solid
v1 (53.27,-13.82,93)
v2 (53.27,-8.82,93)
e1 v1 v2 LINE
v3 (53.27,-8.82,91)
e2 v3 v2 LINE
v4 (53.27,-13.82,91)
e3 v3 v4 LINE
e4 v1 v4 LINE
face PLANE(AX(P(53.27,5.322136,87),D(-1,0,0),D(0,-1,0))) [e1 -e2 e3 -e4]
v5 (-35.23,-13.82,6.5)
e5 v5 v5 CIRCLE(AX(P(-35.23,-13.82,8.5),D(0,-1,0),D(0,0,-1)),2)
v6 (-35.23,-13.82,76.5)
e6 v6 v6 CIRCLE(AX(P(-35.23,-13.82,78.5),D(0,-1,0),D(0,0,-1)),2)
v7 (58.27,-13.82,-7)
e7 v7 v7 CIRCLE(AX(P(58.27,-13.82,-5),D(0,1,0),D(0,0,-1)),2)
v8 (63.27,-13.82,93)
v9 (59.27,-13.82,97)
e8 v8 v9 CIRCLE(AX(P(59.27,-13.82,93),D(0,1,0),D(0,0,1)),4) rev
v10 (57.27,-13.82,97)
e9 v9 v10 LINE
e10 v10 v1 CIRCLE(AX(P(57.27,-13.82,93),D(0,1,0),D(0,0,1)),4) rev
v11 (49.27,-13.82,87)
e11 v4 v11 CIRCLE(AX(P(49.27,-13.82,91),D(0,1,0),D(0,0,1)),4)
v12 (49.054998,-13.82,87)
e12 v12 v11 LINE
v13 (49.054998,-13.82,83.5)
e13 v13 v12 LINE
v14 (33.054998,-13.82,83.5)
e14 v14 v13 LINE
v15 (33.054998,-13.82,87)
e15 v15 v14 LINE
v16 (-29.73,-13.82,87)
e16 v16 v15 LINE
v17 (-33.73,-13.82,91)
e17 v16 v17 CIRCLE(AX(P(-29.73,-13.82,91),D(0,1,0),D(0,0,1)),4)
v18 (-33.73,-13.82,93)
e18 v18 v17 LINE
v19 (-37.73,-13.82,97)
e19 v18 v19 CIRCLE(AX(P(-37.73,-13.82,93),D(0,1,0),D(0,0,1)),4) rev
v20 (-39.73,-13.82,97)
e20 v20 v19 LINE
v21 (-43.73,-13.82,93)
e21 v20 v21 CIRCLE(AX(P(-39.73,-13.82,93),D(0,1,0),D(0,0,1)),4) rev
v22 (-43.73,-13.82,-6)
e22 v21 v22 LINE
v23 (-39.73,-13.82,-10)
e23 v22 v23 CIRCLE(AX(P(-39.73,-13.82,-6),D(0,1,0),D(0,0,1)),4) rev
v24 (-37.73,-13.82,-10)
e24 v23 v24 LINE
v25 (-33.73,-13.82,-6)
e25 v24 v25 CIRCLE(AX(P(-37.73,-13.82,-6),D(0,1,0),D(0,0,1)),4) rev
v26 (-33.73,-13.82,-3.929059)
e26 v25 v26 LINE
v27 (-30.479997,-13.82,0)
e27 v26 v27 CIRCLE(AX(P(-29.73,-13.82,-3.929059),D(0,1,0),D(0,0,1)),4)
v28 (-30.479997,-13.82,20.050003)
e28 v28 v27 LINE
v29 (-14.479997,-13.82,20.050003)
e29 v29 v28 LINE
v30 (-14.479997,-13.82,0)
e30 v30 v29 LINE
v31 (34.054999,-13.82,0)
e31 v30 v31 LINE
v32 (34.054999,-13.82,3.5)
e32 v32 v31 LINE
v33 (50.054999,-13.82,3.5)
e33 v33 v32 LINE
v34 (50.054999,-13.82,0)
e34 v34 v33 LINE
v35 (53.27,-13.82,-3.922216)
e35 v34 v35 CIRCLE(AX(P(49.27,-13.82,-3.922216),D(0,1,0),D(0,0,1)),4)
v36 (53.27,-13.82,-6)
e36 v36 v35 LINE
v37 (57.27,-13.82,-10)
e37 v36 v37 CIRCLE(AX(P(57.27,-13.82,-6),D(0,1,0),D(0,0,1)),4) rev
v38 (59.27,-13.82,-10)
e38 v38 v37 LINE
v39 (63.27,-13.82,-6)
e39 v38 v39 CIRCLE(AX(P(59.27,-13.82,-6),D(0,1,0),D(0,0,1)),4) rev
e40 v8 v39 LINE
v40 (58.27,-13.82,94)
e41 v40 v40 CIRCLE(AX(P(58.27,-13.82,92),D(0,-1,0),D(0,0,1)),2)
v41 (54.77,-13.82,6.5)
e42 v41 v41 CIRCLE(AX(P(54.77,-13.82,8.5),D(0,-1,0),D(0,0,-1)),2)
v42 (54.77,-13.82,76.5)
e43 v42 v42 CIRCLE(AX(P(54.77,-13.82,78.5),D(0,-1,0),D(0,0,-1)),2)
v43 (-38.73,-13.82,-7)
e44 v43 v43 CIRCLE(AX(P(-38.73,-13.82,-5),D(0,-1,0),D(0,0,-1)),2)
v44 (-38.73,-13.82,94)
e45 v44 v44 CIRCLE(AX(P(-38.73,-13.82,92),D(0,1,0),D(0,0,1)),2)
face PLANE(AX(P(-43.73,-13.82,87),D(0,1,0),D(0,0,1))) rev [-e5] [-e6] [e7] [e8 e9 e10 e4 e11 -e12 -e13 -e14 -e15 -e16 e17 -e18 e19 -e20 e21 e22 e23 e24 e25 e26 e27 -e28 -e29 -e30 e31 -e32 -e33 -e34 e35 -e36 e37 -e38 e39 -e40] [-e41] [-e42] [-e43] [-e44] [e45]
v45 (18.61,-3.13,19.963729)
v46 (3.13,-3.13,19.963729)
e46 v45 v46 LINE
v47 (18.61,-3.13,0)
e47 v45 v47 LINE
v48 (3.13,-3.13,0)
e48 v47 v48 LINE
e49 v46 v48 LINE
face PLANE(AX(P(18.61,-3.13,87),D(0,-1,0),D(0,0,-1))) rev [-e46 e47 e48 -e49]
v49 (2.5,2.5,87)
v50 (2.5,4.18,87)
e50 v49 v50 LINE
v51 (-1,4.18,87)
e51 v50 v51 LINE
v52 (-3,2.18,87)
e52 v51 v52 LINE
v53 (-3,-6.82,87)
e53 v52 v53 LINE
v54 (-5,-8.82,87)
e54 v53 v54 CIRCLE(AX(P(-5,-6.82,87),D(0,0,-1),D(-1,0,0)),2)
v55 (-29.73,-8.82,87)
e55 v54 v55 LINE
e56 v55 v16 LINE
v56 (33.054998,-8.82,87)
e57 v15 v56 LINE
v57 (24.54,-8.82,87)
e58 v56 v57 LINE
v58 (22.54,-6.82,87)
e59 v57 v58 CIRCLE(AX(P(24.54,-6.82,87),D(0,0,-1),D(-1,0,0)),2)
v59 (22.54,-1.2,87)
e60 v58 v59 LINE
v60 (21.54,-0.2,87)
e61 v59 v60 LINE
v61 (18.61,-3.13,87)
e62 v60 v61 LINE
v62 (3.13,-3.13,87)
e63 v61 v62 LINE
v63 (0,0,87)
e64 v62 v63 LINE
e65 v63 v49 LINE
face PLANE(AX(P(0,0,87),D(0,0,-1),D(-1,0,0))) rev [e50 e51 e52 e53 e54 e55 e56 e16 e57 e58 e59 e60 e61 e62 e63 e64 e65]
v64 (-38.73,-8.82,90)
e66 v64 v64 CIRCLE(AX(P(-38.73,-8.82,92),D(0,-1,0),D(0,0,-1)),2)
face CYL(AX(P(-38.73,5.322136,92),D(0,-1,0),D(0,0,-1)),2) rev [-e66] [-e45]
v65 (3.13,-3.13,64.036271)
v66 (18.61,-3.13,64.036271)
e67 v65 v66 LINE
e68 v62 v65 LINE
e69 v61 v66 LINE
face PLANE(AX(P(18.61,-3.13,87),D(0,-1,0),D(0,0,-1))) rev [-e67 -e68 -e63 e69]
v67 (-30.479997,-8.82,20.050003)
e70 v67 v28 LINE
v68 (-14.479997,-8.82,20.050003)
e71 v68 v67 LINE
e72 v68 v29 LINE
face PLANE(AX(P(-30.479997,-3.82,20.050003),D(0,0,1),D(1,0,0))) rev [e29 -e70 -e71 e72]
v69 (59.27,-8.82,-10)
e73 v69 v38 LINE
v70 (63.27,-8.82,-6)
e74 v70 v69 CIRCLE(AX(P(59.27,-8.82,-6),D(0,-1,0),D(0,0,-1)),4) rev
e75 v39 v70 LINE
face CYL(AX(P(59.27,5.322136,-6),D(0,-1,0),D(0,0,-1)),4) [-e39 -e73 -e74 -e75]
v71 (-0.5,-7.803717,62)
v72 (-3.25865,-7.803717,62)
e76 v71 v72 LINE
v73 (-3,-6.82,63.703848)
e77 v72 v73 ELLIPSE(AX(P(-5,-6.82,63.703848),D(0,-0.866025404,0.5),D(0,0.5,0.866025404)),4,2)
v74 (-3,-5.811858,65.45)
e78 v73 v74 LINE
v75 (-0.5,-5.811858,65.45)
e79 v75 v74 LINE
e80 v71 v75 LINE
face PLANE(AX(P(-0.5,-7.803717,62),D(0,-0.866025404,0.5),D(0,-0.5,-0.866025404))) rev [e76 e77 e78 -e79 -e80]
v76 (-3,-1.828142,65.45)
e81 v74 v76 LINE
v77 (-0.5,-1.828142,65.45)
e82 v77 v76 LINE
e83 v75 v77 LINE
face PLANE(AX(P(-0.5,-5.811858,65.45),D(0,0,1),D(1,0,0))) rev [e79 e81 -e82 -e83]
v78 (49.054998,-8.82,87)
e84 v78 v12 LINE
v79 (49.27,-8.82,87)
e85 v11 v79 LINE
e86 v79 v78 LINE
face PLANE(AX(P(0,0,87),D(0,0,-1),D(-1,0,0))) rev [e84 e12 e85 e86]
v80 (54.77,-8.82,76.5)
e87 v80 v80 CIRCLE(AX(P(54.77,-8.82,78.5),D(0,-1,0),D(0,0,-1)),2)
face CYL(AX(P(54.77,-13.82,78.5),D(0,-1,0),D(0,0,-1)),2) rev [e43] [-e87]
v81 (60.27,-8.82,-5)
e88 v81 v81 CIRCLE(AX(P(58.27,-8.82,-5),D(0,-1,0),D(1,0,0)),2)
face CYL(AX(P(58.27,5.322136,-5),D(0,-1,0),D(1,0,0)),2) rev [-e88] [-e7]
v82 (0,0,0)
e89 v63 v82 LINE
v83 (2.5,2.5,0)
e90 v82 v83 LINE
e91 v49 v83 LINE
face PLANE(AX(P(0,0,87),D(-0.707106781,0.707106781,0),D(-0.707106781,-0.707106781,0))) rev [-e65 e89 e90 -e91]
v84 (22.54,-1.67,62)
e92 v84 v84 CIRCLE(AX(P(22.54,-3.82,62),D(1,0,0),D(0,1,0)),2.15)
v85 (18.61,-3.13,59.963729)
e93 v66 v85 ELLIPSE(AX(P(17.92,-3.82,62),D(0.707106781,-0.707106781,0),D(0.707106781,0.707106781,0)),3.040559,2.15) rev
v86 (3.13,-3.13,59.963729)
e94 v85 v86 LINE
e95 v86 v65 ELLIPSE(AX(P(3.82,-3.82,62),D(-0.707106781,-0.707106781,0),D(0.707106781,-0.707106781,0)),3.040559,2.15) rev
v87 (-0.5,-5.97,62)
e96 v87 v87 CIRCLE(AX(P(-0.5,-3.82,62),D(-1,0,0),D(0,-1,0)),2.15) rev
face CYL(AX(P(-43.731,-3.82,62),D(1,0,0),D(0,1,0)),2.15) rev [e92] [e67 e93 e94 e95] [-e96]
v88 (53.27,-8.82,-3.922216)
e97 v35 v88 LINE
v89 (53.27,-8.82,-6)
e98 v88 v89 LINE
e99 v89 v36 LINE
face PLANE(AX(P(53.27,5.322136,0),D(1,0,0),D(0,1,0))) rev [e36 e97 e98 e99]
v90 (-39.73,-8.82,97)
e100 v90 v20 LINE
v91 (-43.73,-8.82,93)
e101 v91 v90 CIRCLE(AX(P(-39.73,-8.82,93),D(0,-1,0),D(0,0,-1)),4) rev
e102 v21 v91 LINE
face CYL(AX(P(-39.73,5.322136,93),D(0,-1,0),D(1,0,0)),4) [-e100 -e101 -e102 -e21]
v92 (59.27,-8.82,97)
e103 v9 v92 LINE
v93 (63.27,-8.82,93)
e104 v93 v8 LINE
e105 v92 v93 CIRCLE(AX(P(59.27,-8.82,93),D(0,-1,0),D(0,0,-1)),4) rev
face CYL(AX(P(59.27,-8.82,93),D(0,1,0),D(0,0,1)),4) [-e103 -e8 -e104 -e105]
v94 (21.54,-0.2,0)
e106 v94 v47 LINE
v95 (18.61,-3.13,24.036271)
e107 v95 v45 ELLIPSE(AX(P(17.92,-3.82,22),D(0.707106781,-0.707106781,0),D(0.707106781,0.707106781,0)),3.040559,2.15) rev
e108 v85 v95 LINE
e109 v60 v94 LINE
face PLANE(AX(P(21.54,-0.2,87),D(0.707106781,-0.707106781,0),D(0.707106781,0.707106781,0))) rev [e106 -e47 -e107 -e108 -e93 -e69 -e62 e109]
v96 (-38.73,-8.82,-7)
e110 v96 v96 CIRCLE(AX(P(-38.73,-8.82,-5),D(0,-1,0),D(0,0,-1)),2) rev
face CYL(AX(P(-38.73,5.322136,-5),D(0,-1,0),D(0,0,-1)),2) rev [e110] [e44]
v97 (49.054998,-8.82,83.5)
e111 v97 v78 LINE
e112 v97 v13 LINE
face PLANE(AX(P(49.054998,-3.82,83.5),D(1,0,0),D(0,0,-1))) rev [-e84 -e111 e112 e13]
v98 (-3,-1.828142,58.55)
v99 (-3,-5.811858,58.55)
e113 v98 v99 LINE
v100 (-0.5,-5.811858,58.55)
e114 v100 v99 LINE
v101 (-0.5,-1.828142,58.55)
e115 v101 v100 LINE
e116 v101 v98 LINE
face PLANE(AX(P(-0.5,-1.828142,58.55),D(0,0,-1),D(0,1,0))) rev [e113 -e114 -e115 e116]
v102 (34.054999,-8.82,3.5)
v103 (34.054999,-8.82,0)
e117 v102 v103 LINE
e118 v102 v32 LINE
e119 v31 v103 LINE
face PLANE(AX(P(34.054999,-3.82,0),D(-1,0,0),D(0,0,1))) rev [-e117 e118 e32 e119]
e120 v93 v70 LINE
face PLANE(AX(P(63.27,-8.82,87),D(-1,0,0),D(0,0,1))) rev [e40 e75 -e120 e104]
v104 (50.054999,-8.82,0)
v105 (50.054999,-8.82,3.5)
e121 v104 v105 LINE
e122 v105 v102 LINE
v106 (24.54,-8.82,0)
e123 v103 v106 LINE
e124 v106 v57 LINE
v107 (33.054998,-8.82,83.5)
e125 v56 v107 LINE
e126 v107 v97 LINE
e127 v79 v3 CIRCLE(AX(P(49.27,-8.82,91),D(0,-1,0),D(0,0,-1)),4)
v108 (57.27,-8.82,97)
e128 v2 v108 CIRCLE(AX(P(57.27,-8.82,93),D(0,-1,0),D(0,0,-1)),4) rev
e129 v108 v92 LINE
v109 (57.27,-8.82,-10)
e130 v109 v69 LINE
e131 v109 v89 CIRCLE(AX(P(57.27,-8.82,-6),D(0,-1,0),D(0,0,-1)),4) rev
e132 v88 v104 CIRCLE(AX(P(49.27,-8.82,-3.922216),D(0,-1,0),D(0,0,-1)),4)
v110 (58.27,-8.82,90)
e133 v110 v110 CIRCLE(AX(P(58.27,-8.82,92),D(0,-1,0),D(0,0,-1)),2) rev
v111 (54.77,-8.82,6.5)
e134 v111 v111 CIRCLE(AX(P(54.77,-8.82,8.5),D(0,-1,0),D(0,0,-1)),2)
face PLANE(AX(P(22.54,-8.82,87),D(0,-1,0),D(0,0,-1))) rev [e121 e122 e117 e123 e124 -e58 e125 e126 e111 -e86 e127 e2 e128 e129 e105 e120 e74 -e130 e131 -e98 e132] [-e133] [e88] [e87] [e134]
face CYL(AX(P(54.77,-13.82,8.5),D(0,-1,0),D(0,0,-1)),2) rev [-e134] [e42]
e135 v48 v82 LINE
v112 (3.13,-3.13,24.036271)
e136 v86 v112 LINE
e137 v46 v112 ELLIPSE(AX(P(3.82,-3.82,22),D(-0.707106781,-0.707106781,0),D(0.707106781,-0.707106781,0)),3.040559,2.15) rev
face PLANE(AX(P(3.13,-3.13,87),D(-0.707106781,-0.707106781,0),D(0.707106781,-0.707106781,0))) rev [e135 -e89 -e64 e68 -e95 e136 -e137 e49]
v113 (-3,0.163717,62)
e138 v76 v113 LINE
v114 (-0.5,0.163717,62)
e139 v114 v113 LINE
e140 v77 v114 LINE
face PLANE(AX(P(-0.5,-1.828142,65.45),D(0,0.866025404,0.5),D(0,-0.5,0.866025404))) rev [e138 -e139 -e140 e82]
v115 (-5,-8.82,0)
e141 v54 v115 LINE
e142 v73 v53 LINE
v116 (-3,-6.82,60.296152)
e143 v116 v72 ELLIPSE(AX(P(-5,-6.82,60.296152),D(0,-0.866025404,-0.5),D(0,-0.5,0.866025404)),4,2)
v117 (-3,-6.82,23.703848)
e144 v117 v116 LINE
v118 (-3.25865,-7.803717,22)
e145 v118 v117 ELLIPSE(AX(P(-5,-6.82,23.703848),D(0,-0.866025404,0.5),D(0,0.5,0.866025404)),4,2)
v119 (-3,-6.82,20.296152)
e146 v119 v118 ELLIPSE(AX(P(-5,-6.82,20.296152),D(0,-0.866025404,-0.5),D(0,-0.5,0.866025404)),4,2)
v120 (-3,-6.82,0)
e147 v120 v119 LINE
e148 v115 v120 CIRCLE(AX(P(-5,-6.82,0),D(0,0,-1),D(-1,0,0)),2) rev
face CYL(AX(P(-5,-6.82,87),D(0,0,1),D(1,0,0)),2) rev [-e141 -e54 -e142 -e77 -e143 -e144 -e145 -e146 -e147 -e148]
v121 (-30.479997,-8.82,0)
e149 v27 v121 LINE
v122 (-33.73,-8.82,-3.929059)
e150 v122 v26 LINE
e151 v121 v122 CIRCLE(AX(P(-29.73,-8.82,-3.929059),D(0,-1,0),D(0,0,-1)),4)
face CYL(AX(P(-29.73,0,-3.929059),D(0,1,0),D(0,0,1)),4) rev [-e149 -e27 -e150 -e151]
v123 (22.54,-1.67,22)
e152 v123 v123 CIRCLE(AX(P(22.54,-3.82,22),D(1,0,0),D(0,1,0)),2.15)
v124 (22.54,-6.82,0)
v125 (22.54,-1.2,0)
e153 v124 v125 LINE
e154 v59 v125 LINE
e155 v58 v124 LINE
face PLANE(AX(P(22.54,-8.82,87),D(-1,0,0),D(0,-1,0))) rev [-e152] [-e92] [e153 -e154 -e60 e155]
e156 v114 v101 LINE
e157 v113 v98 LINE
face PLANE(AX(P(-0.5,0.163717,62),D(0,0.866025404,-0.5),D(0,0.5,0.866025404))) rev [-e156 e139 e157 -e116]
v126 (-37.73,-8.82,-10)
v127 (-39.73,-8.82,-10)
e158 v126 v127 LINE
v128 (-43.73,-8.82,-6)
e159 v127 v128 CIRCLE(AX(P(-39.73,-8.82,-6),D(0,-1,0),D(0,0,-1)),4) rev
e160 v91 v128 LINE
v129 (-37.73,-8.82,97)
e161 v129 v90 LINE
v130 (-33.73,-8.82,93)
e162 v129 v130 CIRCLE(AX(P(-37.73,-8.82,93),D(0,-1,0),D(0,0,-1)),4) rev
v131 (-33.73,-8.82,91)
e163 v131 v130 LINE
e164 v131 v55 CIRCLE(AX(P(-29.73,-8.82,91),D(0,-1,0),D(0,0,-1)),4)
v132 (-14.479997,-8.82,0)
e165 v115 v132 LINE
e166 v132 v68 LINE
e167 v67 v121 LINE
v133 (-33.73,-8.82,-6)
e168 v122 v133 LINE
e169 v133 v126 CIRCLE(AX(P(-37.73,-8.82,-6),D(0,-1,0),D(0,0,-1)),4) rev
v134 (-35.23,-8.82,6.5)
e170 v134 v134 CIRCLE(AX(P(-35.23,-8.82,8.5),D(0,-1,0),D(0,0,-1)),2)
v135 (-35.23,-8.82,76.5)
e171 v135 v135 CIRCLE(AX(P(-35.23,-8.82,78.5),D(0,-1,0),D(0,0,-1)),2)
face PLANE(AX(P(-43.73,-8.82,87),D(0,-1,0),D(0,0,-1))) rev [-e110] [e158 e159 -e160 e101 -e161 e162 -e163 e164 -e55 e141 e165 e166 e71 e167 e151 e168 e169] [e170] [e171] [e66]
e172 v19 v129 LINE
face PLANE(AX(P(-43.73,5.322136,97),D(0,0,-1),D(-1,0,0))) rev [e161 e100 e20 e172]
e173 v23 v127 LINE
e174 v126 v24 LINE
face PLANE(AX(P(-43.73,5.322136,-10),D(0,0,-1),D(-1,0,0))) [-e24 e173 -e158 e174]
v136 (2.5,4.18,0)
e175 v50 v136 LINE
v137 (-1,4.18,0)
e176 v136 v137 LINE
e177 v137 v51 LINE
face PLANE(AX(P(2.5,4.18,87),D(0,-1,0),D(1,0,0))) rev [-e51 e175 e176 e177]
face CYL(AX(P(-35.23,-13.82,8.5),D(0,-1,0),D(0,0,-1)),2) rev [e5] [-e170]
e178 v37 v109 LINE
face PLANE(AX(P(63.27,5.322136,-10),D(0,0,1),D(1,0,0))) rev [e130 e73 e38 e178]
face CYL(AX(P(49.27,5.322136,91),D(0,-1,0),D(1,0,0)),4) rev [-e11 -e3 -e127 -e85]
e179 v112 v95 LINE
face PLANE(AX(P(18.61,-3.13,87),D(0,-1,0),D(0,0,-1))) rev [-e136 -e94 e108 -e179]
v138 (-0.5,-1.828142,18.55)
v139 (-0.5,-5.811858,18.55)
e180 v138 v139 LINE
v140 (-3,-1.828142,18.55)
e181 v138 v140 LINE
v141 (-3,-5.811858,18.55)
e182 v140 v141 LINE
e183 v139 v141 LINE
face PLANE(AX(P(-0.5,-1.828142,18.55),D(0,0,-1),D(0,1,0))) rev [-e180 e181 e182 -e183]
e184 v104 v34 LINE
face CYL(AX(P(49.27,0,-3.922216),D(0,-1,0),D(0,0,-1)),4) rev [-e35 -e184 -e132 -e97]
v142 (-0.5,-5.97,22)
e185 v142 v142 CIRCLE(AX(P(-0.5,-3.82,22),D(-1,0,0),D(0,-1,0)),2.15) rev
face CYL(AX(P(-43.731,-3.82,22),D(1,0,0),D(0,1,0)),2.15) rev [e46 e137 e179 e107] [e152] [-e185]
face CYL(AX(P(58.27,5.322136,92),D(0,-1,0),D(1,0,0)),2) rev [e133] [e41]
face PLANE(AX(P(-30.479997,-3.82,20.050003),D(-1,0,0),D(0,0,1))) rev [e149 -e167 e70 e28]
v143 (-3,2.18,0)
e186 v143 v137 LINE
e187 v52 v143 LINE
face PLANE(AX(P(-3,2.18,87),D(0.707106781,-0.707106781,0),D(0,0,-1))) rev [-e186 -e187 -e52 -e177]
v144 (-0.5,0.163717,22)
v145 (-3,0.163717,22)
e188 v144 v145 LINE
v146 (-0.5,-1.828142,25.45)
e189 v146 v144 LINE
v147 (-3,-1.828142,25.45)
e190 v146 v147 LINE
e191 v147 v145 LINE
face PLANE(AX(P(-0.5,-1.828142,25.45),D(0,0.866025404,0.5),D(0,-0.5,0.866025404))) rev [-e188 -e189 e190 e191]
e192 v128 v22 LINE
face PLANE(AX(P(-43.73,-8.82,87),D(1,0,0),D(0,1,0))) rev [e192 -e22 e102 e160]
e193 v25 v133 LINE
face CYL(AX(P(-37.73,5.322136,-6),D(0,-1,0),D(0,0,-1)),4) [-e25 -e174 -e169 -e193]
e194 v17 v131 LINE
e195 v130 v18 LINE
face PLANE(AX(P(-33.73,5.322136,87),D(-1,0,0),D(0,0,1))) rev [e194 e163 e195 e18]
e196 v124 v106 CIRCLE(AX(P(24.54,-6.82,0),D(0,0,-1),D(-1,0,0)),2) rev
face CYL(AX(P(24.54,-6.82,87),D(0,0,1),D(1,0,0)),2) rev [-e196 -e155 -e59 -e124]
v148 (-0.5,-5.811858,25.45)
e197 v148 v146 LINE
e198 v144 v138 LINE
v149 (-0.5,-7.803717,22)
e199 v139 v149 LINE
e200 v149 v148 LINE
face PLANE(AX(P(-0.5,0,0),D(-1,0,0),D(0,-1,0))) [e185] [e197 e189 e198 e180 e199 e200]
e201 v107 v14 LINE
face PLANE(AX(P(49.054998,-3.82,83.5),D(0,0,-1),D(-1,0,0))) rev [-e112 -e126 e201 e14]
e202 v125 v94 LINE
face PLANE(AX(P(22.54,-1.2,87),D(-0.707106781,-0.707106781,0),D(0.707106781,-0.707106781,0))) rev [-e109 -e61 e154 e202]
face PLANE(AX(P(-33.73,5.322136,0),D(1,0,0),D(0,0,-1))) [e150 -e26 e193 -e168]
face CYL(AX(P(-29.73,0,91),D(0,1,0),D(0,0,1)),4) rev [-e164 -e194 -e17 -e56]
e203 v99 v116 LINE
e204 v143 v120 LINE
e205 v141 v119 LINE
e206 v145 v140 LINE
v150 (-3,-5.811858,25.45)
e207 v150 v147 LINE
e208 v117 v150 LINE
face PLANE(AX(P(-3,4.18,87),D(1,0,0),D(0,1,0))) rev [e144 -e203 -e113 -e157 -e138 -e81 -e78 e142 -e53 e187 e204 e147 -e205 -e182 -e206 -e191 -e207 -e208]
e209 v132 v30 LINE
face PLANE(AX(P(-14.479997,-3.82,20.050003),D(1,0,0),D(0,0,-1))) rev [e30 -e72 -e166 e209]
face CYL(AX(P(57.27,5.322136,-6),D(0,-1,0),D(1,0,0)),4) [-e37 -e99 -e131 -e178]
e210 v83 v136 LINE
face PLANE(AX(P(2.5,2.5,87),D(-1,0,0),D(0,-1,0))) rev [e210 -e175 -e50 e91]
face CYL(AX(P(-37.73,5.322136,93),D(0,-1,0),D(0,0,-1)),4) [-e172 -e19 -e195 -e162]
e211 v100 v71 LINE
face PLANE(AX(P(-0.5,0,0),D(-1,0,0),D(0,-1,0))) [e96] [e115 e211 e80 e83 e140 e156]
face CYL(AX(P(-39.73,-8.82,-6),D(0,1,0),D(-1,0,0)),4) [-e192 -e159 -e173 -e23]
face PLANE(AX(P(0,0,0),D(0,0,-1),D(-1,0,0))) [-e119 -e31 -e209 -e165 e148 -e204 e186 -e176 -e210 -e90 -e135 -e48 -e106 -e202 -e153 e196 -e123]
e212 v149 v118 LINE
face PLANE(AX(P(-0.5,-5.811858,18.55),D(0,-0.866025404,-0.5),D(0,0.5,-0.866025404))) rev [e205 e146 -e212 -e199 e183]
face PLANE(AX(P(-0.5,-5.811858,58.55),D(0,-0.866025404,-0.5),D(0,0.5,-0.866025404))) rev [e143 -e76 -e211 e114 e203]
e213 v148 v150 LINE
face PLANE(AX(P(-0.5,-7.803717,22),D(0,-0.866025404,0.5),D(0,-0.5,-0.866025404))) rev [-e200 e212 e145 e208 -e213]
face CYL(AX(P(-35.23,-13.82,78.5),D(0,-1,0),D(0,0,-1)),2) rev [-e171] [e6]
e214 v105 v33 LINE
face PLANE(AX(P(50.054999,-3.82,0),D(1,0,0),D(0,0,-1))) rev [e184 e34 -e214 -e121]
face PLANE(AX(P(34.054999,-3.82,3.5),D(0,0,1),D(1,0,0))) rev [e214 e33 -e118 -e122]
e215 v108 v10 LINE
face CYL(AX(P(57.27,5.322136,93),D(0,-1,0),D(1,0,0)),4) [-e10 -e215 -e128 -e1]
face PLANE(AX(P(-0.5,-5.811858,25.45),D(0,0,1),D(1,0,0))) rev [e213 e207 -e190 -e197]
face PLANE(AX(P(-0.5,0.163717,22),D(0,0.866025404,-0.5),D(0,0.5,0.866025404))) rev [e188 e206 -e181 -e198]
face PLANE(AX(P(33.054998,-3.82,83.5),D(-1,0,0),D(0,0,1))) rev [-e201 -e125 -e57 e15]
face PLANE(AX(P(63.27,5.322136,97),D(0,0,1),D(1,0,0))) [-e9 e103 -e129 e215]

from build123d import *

# Parameters (mm, degrees)
BOSS_EXTRUDE1_DEPTH             = 87
CUT_EXTRUDE2_REACH              = 112.235
SKETCH7_R                       = 2.15
CUT_EXTRUDE3_DEPTH              = 2.5
F_4_0_START                     = -13.82
F_4_0_MM_DOWEL_HOLES1_OUTLINE_R = 2
F_4_0_MM_DOWEL_HOLES1_DEPTH     = 5.82
SKETCH11_W                      = 16
SKETCH11_H                      = 20.05000263
SKETCH11_H_2                    = 3.5
CUT_EXTRUDE4_DEPTH              = 10
SKETCH12_W                      = 10
SKETCH12_H                      = 10
SKETCH12_R                      = 2
BOSS_EXTRUDE2_DEPTH             = 5
MIRROR2_COPY_1_SKETCH_W         = 10
MIRROR2_COPY_1_SKETCH_H         = 10
MIRROR2_COPY_1_SKETCH_R         = 2
MIRROR2_COPY_1_DEPTH            = 5
FILLET1_R                       = 4
FILLET2_R                       = 2
CHAMFER1_SIZE                   = 2


with BuildPart() as part:
    # Sketch1 → Boss-Extrude1 (new body)
    with BuildSketch(Plane.XY):
        Polygon((0, 0), (2.5, 2.5), (2.5, 4.18), (-3, 4.18), (-3, -8.82), (-43.73, -8.82), (-43.73, -13.82), (63.27, -13.82), (63.27, -8.82), (22.54, -8.82), (22.54, -1.2), (21.54, -0.2), (18.61, -3.13), (3.13, -3.13), align=None)
    extrude(amount=BOSS_EXTRUDE1_DEPTH)

    # Sketch7 → Cut-Extrude2 (cut, up to next)
    with BuildSketch(Plane(origin=(22.54, 0, 0), x_dir=(0, 0, -1), z_dir=(1, 0, 0)), mode=Mode.PRIVATE) as cut_extrude2_sk1:
        with Locations(Location((-62, -3.82, 0), (0, 0, 90))):
            Circle(SKETCH7_R)
    cut_extrude2_tool1 = extrude(cut_extrude2_sk1.sketch, amount=-CUT_EXTRUDE2_REACH, mode=Mode.PRIVATE) & part.part
    # Sketch7 → Cut-Extrude2 (cut, up to next)
    with BuildSketch(Plane(origin=(22.54, 0, 0), x_dir=(0, 0, -1), z_dir=(1, 0, 0)), mode=Mode.PRIVATE) as cut_extrude2_sk2:
        with Locations(Location((-22, -3.82, 0), (0, 0, 90))):
            Circle(SKETCH7_R)
    cut_extrude2_tool2 = extrude(cut_extrude2_sk2.sketch, amount=-CUT_EXTRUDE2_REACH, mode=Mode.PRIVATE) & part.part
    add(cut_extrude2_tool1.solids().sort_by_distance((22.54, -3.82, 62))[0], mode=Mode.SUBTRACT)
    add(cut_extrude2_tool2.solids().sort_by_distance((22.54, -3.82, 22))[0], mode=Mode.SUBTRACT)

    # Sketch8 → Cut-Extrude3 (cut)
    with BuildSketch(Plane.ZY.offset(3)):
        Polygon((25.45, -5.811858429), (25.45, -1.828141571), (22, 0.163716857), (18.55, -1.828141571), (18.55, -5.811858429), (22, -7.803716857), align=None)
        Polygon((65.45, -5.811858429), (65.45, -1.828141571), (62, 0.163716857), (58.55, -1.828141571), (58.55, -5.811858429), (62, -7.803716857), align=None)
    extrude(amount=-CUT_EXTRUDE3_DEPTH, mode=Mode.SUBTRACT)

    # Ø4.0 mm Dowel Holes1: read off the stored shape, not the designer's step
    # Ø4.0 mm Dowel Holes1 outline → Ø4.0 mm Dowel Holes1 (cut)
    with BuildSketch(Plane(origin=(0, 0, 0), x_dir=(1, 0, 0), z_dir=(0, 1, 0)).offset(F_4_0_START)):
        with Locations((54.77, -78.5)):
            Circle(F_4_0_MM_DOWEL_HOLES1_OUTLINE_R)
        with Locations((-35.23, -8.5)):
            Circle(F_4_0_MM_DOWEL_HOLES1_OUTLINE_R)
        with Locations((54.77, -8.5)):
            Circle(F_4_0_MM_DOWEL_HOLES1_OUTLINE_R)
        with Locations((-35.23, -78.5)):
            Circle(F_4_0_MM_DOWEL_HOLES1_OUTLINE_R)
    extrude(amount=F_4_0_MM_DOWEL_HOLES1_DEPTH, mode=Mode.SUBTRACT)

    # Sketch11 → Cut-Extrude4 (cut)
    with BuildSketch(Plane.XZ.offset(13.82)):
        with Locations((-22.479997093, 10.025001315)):
            Rectangle(SKETCH11_W, SKETCH11_H)
        with Locations((42.054998939, 1.75)):
            Rectangle(SKETCH11_W, SKETCH11_H_2)
        with Locations((41.054998153, 85.25)):
            Rectangle(SKETCH11_W, SKETCH11_H_2)
    extrude(amount=-CUT_EXTRUDE4_DEPTH, mode=Mode.SUBTRACT)

    # Sketch12 → Boss-Extrude2 (add)
    with BuildSketch(Plane.XZ.offset(13.82)):
        with Locations((-38.73, -5)):
            Rectangle(SKETCH12_W, SKETCH12_H)
        with Locations(Location((-38.73, -5, 0), (0, 0, 270))):
            Circle(SKETCH12_R, mode=Mode.SUBTRACT)
    boss_extrude2 = extrude(amount=-BOSS_EXTRUDE2_DEPTH)

    # Mirror1: Boss-Extrude2 across plane
    add(boss_extrude2.mirror(Plane.XY.offset(43.5)))

    # Mirror2: Boss-Extrude2 across plane
    add(boss_extrude2.mirror(Plane.ZY.offset(-9.77)))

    # Mirror2 copy 1 sketch → Mirror2 copy 1 (add)
    with BuildSketch(Plane(origin=(19.54, -13.82, 87), x_dir=(-1, 0, 0), z_dir=(0, -1, 0))):
        with Locations((-38.73, -5)):
            Rectangle(MIRROR2_COPY_1_SKETCH_W, MIRROR2_COPY_1_SKETCH_H)
        with Locations(Location((-38.73, -5, 0), (0, 0, 270))):
            Circle(MIRROR2_COPY_1_SKETCH_R, mode=Mode.SUBTRACT)
    extrude(amount=-MIRROR2_COPY_1_DEPTH)

    # Fillet1
    # the kernel refuses this fillet: 4 mm, written as the material it adds along each edge
    with BuildSketch(Plane(origin=(-33.73, -13.82, 87), x_dir=(1, 0, 0), z_dir=(0, 1, 0)), Plane(origin=(53.27, -13.82, 87), x_dir=(0, 0, 1), z_dir=(0, 1, 0))) as fillet1_piece_1:
        with BuildLine():
            CenterArc((FILLET1_R, -FILLET1_R), FILLET1_R, 90, 90)
            Line((0, -FILLET1_R), (0, 0))
            Line((0, 0), (FILLET1_R, 0))
        make_face()
    extrude(amount=5)
    with BuildSketch(Plane(origin=(-33.73, -13.82, 0), x_dir=(1, 0, 0), z_dir=(0, 1, 0))) as fillet1_piece_2:
        with BuildLine():
            CenterArc((4, 3.929058966), FILLET1_R, 180, 79.193119511)
            Line((0, 3.929058966), (0, 0))
            Line((0, 0), (3.250002907, 0))
        make_face()
    extrude(amount=5)
    with BuildSketch(Plane(origin=(53.27, -13.82, 0), x_dir=(-1.0, -2.775557561562891e-15, -1.2049110107124816e-12), z_dir=(0, 1, 0))) as fillet1_piece_3:
        with BuildLine():
            CenterArc((4, -3.922215785), FILLET1_R, 101.317738871, 78.682261129)
            Line((0, -3.922215785), (0, 0))
            Line((0, 0), (3.215001061, 0))
        make_face()
    extrude(amount=5)
    # the kernel refuses this fillet: 4 mm, written as the material it takes off along each edge
    with BuildSketch(Plane(origin=(-33.73, -23.82, 97), x_dir=(-1, 0, 0), z_dir=(0, 1, 0)), Plane(origin=(-43.73, -23.82, 97), x_dir=(0, 0, -1), z_dir=(0, 1, 0)), Plane(origin=(-43.73, -23.82, -10), x_dir=(1, 0, 0), z_dir=(0, 1, 0)), Plane(origin=(-33.73, -23.82, -10), x_dir=(0, 0, 1), z_dir=(0, 1, 0))) as fillet1_2_piece_1:
        with BuildLine():
            CenterArc((FILLET1_R, -FILLET1_R), FILLET1_R, 90, 90)
            Line((0, -FILLET1_R), (0, 0))
            Line((0, 0), (FILLET1_R, 0))
        make_face()
    extrude(amount=25, mode=Mode.SUBTRACT)
    with BuildSketch(Plane(origin=(53.27, -23.82, -10), x_dir=(0, 0, 1), z_dir=(0, 1, 0)), Plane(origin=(53.27, -23.82, 97), x_dir=(1, 0, 0), z_dir=(0, 1, 0)), Plane(origin=(63.27, -23.82, 97), x_dir=(0, 0, -1), z_dir=(0, 1, 0)), Plane(origin=(63.27, -23.82, -10), x_dir=(-1, 0, 0), z_dir=(0, 1, 0))) as fillet1_2_piece_2:
        with BuildLine():
            CenterArc((FILLET1_R, FILLET1_R), FILLET1_R, 180, 90)
            Line((0, FILLET1_R), (0, 0))
            Line((0, 0), (FILLET1_R, 0))
        make_face()
    extrude(amount=25, mode=Mode.SUBTRACT)

    # Fillet2
    # the kernel refuses this fillet: 2 mm, written as the material it adds along each edge
    with BuildSketch(Plane(origin=(22.54, -8.82, 0), x_dir=(1, 0, 0), z_dir=(0, 0, 1))) as fillet2_piece_1:
        with BuildLine():
            CenterArc((FILLET2_R, FILLET2_R), FILLET2_R, 180, 90)
            Line((0, FILLET2_R), (0, 0))
            Line((0, 0), (FILLET2_R, 0))
        make_face()
    extrude(amount=87)
    with BuildSketch(Plane(origin=(-3, -8.82, 0), x_dir=(-1, 0, 0), z_dir=(0, 0, 1))) as fillet2_piece_2_section:
        with BuildLine():
            CenterArc((FILLET2_R, -FILLET2_R), FILLET2_R, 90, 90)
            Line((0, -FILLET2_R), (0, 0))
            Line((0, 0), (FILLET2_R, 0))
        make_face()
    fillet2_piece_2 = extrude(amount=87, mode=Mode.PRIVATE)
    fillet2_piece_2 = split(fillet2_piece_2, bisect_by=Plane(origin=(-3, -17.584067085, 5.059936491), z_dir=(0, 0.8660254037844386, -0.5000000000000001)), keep=Keep.TOP, mode=Mode.PRIVATE)
    fillet2_piece_2 = split(fillet2_piece_2, bisect_by=Plane(origin=(-3, 1.468491799, 5.940063509), z_dir=(0, -0.8660254037844385, -0.5000000000000003)), keep=Keep.TOP, mode=Mode.PRIVATE)
    add(fillet2_piece_2)
    with BuildSketch(Plane(origin=(-3, -8.82, 0), x_dir=(-1, 0, 0), z_dir=(0, 0, 1))) as fillet2_piece_3_section:
        with BuildLine():
            CenterArc((FILLET2_R, -FILLET2_R), FILLET2_R, 90, 90)
            Line((0, -FILLET2_R), (0, 0))
            Line((0, 0), (FILLET2_R, 0))
        make_face()
    fillet2_piece_3 = extrude(amount=87, mode=Mode.PRIVATE)
    fillet2_piece_3 = split(fillet2_piece_3, bisect_by=Plane(origin=(-3, -17.584067085, 5.059936491), z_dir=(0, -0.8660254037844386, 0.5000000000000001)), keep=Keep.TOP, mode=Mode.PRIVATE)
    fillet2_piece_3 = split(fillet2_piece_3, bisect_by=Plane(origin=(-3, 1.468491799, 5.940063509), z_dir=(0, -0.8660254037844385, -0.5000000000000003)), keep=Keep.TOP, mode=Mode.PRIVATE)
    add(fillet2_piece_3)
    with BuildSketch(Plane(origin=(-3, -8.82, 0), x_dir=(-1, 0, 0), z_dir=(0, 0, 1))) as fillet2_piece_4_section:
        with BuildLine():
            CenterArc((FILLET2_R, -FILLET2_R), FILLET2_R, 90, 90)
            Line((0, -FILLET2_R), (0, 0))
            Line((0, 0), (FILLET2_R, 0))
        make_face()
    fillet2_piece_4 = extrude(amount=87, mode=Mode.PRIVATE)
    fillet2_piece_4 = split(fillet2_piece_4, bisect_by=Plane(origin=(-3, -34.90457516, 15.059936491), z_dir=(0, 0.8660254037844385, -0.5000000000000003)), keep=Keep.TOP, mode=Mode.PRIVATE)
    fillet2_piece_4 = split(fillet2_piece_4, bisect_by=Plane(origin=(-3, 18.788999874, 15.940063509), z_dir=(0, -0.8660254037844385, -0.5000000000000003)), keep=Keep.TOP, mode=Mode.PRIVATE)
    fillet2_piece_4 = split(fillet2_piece_4, bisect_by=Plane(origin=(-3, -17.584067085, 5.059936491), z_dir=(0, -0.8660254037844386, 0.5000000000000001)), keep=Keep.TOP, mode=Mode.PRIVATE)
    fillet2_piece_4 = split(fillet2_piece_4, bisect_by=Plane(origin=(-3, 1.468491799, 5.940063509), z_dir=(0, 0.8660254037844385, 0.5000000000000003)), keep=Keep.TOP, mode=Mode.PRIVATE)
    add(fillet2_piece_4)
    with BuildSketch(Plane(origin=(-3, -8.82, 0), x_dir=(-1, 0, 0), z_dir=(0, 0, 1))) as fillet2_piece_5_section:
        with BuildLine():
            CenterArc((FILLET2_R, -FILLET2_R), FILLET2_R, 90, 90)
            Line((0, -FILLET2_R), (0, 0))
            Line((0, 0), (FILLET2_R, 0))
        make_face()
    fillet2_piece_5 = extrude(amount=87, mode=Mode.PRIVATE)
    fillet2_piece_5 = split(fillet2_piece_5, bisect_by=Plane(origin=(-3, -34.90457516, 15.059936491), z_dir=(0, -0.8660254037844385, 0.5000000000000003)), keep=Keep.TOP, mode=Mode.PRIVATE)
    fillet2_piece_5 = split(fillet2_piece_5, bisect_by=Plane(origin=(-3, 18.788999874, 15.940063509), z_dir=(0, -0.8660254037844385, -0.5000000000000003)), keep=Keep.TOP, mode=Mode.PRIVATE)
    add(fillet2_piece_5)
    with BuildSketch(Plane(origin=(-3, -8.82, 0), x_dir=(-1, 0, 0), z_dir=(0, 0, 1))) as fillet2_piece_6_section:
        with BuildLine():
            CenterArc((FILLET2_R, -FILLET2_R), FILLET2_R, 90, 90)
            Line((0, -FILLET2_R), (0, 0))
            Line((0, 0), (FILLET2_R, 0))
        make_face()
    fillet2_piece_6 = extrude(amount=87, mode=Mode.PRIVATE)
    fillet2_piece_6 = split(fillet2_piece_6, bisect_by=Plane(origin=(-3, -34.90457516, 15.059936491), z_dir=(0, -0.8660254037844385, 0.5000000000000003)), keep=Keep.TOP, mode=Mode.PRIVATE)
    fillet2_piece_6 = split(fillet2_piece_6, bisect_by=Plane(origin=(-3, 18.788999874, 15.940063509), z_dir=(0, 0.8660254037844385, 0.5000000000000003)), keep=Keep.TOP, mode=Mode.PRIVATE)
    add(fillet2_piece_6)

    # Chamfer1
    chamfer1_edges = [part.edges().sort_by_distance(p)[0] for p in [
        (-3, 4.18, 43.5),
    ]]
    chamfer(chamfer1_edges, length=CHAMFER1_SIZE)


solid = part.part
